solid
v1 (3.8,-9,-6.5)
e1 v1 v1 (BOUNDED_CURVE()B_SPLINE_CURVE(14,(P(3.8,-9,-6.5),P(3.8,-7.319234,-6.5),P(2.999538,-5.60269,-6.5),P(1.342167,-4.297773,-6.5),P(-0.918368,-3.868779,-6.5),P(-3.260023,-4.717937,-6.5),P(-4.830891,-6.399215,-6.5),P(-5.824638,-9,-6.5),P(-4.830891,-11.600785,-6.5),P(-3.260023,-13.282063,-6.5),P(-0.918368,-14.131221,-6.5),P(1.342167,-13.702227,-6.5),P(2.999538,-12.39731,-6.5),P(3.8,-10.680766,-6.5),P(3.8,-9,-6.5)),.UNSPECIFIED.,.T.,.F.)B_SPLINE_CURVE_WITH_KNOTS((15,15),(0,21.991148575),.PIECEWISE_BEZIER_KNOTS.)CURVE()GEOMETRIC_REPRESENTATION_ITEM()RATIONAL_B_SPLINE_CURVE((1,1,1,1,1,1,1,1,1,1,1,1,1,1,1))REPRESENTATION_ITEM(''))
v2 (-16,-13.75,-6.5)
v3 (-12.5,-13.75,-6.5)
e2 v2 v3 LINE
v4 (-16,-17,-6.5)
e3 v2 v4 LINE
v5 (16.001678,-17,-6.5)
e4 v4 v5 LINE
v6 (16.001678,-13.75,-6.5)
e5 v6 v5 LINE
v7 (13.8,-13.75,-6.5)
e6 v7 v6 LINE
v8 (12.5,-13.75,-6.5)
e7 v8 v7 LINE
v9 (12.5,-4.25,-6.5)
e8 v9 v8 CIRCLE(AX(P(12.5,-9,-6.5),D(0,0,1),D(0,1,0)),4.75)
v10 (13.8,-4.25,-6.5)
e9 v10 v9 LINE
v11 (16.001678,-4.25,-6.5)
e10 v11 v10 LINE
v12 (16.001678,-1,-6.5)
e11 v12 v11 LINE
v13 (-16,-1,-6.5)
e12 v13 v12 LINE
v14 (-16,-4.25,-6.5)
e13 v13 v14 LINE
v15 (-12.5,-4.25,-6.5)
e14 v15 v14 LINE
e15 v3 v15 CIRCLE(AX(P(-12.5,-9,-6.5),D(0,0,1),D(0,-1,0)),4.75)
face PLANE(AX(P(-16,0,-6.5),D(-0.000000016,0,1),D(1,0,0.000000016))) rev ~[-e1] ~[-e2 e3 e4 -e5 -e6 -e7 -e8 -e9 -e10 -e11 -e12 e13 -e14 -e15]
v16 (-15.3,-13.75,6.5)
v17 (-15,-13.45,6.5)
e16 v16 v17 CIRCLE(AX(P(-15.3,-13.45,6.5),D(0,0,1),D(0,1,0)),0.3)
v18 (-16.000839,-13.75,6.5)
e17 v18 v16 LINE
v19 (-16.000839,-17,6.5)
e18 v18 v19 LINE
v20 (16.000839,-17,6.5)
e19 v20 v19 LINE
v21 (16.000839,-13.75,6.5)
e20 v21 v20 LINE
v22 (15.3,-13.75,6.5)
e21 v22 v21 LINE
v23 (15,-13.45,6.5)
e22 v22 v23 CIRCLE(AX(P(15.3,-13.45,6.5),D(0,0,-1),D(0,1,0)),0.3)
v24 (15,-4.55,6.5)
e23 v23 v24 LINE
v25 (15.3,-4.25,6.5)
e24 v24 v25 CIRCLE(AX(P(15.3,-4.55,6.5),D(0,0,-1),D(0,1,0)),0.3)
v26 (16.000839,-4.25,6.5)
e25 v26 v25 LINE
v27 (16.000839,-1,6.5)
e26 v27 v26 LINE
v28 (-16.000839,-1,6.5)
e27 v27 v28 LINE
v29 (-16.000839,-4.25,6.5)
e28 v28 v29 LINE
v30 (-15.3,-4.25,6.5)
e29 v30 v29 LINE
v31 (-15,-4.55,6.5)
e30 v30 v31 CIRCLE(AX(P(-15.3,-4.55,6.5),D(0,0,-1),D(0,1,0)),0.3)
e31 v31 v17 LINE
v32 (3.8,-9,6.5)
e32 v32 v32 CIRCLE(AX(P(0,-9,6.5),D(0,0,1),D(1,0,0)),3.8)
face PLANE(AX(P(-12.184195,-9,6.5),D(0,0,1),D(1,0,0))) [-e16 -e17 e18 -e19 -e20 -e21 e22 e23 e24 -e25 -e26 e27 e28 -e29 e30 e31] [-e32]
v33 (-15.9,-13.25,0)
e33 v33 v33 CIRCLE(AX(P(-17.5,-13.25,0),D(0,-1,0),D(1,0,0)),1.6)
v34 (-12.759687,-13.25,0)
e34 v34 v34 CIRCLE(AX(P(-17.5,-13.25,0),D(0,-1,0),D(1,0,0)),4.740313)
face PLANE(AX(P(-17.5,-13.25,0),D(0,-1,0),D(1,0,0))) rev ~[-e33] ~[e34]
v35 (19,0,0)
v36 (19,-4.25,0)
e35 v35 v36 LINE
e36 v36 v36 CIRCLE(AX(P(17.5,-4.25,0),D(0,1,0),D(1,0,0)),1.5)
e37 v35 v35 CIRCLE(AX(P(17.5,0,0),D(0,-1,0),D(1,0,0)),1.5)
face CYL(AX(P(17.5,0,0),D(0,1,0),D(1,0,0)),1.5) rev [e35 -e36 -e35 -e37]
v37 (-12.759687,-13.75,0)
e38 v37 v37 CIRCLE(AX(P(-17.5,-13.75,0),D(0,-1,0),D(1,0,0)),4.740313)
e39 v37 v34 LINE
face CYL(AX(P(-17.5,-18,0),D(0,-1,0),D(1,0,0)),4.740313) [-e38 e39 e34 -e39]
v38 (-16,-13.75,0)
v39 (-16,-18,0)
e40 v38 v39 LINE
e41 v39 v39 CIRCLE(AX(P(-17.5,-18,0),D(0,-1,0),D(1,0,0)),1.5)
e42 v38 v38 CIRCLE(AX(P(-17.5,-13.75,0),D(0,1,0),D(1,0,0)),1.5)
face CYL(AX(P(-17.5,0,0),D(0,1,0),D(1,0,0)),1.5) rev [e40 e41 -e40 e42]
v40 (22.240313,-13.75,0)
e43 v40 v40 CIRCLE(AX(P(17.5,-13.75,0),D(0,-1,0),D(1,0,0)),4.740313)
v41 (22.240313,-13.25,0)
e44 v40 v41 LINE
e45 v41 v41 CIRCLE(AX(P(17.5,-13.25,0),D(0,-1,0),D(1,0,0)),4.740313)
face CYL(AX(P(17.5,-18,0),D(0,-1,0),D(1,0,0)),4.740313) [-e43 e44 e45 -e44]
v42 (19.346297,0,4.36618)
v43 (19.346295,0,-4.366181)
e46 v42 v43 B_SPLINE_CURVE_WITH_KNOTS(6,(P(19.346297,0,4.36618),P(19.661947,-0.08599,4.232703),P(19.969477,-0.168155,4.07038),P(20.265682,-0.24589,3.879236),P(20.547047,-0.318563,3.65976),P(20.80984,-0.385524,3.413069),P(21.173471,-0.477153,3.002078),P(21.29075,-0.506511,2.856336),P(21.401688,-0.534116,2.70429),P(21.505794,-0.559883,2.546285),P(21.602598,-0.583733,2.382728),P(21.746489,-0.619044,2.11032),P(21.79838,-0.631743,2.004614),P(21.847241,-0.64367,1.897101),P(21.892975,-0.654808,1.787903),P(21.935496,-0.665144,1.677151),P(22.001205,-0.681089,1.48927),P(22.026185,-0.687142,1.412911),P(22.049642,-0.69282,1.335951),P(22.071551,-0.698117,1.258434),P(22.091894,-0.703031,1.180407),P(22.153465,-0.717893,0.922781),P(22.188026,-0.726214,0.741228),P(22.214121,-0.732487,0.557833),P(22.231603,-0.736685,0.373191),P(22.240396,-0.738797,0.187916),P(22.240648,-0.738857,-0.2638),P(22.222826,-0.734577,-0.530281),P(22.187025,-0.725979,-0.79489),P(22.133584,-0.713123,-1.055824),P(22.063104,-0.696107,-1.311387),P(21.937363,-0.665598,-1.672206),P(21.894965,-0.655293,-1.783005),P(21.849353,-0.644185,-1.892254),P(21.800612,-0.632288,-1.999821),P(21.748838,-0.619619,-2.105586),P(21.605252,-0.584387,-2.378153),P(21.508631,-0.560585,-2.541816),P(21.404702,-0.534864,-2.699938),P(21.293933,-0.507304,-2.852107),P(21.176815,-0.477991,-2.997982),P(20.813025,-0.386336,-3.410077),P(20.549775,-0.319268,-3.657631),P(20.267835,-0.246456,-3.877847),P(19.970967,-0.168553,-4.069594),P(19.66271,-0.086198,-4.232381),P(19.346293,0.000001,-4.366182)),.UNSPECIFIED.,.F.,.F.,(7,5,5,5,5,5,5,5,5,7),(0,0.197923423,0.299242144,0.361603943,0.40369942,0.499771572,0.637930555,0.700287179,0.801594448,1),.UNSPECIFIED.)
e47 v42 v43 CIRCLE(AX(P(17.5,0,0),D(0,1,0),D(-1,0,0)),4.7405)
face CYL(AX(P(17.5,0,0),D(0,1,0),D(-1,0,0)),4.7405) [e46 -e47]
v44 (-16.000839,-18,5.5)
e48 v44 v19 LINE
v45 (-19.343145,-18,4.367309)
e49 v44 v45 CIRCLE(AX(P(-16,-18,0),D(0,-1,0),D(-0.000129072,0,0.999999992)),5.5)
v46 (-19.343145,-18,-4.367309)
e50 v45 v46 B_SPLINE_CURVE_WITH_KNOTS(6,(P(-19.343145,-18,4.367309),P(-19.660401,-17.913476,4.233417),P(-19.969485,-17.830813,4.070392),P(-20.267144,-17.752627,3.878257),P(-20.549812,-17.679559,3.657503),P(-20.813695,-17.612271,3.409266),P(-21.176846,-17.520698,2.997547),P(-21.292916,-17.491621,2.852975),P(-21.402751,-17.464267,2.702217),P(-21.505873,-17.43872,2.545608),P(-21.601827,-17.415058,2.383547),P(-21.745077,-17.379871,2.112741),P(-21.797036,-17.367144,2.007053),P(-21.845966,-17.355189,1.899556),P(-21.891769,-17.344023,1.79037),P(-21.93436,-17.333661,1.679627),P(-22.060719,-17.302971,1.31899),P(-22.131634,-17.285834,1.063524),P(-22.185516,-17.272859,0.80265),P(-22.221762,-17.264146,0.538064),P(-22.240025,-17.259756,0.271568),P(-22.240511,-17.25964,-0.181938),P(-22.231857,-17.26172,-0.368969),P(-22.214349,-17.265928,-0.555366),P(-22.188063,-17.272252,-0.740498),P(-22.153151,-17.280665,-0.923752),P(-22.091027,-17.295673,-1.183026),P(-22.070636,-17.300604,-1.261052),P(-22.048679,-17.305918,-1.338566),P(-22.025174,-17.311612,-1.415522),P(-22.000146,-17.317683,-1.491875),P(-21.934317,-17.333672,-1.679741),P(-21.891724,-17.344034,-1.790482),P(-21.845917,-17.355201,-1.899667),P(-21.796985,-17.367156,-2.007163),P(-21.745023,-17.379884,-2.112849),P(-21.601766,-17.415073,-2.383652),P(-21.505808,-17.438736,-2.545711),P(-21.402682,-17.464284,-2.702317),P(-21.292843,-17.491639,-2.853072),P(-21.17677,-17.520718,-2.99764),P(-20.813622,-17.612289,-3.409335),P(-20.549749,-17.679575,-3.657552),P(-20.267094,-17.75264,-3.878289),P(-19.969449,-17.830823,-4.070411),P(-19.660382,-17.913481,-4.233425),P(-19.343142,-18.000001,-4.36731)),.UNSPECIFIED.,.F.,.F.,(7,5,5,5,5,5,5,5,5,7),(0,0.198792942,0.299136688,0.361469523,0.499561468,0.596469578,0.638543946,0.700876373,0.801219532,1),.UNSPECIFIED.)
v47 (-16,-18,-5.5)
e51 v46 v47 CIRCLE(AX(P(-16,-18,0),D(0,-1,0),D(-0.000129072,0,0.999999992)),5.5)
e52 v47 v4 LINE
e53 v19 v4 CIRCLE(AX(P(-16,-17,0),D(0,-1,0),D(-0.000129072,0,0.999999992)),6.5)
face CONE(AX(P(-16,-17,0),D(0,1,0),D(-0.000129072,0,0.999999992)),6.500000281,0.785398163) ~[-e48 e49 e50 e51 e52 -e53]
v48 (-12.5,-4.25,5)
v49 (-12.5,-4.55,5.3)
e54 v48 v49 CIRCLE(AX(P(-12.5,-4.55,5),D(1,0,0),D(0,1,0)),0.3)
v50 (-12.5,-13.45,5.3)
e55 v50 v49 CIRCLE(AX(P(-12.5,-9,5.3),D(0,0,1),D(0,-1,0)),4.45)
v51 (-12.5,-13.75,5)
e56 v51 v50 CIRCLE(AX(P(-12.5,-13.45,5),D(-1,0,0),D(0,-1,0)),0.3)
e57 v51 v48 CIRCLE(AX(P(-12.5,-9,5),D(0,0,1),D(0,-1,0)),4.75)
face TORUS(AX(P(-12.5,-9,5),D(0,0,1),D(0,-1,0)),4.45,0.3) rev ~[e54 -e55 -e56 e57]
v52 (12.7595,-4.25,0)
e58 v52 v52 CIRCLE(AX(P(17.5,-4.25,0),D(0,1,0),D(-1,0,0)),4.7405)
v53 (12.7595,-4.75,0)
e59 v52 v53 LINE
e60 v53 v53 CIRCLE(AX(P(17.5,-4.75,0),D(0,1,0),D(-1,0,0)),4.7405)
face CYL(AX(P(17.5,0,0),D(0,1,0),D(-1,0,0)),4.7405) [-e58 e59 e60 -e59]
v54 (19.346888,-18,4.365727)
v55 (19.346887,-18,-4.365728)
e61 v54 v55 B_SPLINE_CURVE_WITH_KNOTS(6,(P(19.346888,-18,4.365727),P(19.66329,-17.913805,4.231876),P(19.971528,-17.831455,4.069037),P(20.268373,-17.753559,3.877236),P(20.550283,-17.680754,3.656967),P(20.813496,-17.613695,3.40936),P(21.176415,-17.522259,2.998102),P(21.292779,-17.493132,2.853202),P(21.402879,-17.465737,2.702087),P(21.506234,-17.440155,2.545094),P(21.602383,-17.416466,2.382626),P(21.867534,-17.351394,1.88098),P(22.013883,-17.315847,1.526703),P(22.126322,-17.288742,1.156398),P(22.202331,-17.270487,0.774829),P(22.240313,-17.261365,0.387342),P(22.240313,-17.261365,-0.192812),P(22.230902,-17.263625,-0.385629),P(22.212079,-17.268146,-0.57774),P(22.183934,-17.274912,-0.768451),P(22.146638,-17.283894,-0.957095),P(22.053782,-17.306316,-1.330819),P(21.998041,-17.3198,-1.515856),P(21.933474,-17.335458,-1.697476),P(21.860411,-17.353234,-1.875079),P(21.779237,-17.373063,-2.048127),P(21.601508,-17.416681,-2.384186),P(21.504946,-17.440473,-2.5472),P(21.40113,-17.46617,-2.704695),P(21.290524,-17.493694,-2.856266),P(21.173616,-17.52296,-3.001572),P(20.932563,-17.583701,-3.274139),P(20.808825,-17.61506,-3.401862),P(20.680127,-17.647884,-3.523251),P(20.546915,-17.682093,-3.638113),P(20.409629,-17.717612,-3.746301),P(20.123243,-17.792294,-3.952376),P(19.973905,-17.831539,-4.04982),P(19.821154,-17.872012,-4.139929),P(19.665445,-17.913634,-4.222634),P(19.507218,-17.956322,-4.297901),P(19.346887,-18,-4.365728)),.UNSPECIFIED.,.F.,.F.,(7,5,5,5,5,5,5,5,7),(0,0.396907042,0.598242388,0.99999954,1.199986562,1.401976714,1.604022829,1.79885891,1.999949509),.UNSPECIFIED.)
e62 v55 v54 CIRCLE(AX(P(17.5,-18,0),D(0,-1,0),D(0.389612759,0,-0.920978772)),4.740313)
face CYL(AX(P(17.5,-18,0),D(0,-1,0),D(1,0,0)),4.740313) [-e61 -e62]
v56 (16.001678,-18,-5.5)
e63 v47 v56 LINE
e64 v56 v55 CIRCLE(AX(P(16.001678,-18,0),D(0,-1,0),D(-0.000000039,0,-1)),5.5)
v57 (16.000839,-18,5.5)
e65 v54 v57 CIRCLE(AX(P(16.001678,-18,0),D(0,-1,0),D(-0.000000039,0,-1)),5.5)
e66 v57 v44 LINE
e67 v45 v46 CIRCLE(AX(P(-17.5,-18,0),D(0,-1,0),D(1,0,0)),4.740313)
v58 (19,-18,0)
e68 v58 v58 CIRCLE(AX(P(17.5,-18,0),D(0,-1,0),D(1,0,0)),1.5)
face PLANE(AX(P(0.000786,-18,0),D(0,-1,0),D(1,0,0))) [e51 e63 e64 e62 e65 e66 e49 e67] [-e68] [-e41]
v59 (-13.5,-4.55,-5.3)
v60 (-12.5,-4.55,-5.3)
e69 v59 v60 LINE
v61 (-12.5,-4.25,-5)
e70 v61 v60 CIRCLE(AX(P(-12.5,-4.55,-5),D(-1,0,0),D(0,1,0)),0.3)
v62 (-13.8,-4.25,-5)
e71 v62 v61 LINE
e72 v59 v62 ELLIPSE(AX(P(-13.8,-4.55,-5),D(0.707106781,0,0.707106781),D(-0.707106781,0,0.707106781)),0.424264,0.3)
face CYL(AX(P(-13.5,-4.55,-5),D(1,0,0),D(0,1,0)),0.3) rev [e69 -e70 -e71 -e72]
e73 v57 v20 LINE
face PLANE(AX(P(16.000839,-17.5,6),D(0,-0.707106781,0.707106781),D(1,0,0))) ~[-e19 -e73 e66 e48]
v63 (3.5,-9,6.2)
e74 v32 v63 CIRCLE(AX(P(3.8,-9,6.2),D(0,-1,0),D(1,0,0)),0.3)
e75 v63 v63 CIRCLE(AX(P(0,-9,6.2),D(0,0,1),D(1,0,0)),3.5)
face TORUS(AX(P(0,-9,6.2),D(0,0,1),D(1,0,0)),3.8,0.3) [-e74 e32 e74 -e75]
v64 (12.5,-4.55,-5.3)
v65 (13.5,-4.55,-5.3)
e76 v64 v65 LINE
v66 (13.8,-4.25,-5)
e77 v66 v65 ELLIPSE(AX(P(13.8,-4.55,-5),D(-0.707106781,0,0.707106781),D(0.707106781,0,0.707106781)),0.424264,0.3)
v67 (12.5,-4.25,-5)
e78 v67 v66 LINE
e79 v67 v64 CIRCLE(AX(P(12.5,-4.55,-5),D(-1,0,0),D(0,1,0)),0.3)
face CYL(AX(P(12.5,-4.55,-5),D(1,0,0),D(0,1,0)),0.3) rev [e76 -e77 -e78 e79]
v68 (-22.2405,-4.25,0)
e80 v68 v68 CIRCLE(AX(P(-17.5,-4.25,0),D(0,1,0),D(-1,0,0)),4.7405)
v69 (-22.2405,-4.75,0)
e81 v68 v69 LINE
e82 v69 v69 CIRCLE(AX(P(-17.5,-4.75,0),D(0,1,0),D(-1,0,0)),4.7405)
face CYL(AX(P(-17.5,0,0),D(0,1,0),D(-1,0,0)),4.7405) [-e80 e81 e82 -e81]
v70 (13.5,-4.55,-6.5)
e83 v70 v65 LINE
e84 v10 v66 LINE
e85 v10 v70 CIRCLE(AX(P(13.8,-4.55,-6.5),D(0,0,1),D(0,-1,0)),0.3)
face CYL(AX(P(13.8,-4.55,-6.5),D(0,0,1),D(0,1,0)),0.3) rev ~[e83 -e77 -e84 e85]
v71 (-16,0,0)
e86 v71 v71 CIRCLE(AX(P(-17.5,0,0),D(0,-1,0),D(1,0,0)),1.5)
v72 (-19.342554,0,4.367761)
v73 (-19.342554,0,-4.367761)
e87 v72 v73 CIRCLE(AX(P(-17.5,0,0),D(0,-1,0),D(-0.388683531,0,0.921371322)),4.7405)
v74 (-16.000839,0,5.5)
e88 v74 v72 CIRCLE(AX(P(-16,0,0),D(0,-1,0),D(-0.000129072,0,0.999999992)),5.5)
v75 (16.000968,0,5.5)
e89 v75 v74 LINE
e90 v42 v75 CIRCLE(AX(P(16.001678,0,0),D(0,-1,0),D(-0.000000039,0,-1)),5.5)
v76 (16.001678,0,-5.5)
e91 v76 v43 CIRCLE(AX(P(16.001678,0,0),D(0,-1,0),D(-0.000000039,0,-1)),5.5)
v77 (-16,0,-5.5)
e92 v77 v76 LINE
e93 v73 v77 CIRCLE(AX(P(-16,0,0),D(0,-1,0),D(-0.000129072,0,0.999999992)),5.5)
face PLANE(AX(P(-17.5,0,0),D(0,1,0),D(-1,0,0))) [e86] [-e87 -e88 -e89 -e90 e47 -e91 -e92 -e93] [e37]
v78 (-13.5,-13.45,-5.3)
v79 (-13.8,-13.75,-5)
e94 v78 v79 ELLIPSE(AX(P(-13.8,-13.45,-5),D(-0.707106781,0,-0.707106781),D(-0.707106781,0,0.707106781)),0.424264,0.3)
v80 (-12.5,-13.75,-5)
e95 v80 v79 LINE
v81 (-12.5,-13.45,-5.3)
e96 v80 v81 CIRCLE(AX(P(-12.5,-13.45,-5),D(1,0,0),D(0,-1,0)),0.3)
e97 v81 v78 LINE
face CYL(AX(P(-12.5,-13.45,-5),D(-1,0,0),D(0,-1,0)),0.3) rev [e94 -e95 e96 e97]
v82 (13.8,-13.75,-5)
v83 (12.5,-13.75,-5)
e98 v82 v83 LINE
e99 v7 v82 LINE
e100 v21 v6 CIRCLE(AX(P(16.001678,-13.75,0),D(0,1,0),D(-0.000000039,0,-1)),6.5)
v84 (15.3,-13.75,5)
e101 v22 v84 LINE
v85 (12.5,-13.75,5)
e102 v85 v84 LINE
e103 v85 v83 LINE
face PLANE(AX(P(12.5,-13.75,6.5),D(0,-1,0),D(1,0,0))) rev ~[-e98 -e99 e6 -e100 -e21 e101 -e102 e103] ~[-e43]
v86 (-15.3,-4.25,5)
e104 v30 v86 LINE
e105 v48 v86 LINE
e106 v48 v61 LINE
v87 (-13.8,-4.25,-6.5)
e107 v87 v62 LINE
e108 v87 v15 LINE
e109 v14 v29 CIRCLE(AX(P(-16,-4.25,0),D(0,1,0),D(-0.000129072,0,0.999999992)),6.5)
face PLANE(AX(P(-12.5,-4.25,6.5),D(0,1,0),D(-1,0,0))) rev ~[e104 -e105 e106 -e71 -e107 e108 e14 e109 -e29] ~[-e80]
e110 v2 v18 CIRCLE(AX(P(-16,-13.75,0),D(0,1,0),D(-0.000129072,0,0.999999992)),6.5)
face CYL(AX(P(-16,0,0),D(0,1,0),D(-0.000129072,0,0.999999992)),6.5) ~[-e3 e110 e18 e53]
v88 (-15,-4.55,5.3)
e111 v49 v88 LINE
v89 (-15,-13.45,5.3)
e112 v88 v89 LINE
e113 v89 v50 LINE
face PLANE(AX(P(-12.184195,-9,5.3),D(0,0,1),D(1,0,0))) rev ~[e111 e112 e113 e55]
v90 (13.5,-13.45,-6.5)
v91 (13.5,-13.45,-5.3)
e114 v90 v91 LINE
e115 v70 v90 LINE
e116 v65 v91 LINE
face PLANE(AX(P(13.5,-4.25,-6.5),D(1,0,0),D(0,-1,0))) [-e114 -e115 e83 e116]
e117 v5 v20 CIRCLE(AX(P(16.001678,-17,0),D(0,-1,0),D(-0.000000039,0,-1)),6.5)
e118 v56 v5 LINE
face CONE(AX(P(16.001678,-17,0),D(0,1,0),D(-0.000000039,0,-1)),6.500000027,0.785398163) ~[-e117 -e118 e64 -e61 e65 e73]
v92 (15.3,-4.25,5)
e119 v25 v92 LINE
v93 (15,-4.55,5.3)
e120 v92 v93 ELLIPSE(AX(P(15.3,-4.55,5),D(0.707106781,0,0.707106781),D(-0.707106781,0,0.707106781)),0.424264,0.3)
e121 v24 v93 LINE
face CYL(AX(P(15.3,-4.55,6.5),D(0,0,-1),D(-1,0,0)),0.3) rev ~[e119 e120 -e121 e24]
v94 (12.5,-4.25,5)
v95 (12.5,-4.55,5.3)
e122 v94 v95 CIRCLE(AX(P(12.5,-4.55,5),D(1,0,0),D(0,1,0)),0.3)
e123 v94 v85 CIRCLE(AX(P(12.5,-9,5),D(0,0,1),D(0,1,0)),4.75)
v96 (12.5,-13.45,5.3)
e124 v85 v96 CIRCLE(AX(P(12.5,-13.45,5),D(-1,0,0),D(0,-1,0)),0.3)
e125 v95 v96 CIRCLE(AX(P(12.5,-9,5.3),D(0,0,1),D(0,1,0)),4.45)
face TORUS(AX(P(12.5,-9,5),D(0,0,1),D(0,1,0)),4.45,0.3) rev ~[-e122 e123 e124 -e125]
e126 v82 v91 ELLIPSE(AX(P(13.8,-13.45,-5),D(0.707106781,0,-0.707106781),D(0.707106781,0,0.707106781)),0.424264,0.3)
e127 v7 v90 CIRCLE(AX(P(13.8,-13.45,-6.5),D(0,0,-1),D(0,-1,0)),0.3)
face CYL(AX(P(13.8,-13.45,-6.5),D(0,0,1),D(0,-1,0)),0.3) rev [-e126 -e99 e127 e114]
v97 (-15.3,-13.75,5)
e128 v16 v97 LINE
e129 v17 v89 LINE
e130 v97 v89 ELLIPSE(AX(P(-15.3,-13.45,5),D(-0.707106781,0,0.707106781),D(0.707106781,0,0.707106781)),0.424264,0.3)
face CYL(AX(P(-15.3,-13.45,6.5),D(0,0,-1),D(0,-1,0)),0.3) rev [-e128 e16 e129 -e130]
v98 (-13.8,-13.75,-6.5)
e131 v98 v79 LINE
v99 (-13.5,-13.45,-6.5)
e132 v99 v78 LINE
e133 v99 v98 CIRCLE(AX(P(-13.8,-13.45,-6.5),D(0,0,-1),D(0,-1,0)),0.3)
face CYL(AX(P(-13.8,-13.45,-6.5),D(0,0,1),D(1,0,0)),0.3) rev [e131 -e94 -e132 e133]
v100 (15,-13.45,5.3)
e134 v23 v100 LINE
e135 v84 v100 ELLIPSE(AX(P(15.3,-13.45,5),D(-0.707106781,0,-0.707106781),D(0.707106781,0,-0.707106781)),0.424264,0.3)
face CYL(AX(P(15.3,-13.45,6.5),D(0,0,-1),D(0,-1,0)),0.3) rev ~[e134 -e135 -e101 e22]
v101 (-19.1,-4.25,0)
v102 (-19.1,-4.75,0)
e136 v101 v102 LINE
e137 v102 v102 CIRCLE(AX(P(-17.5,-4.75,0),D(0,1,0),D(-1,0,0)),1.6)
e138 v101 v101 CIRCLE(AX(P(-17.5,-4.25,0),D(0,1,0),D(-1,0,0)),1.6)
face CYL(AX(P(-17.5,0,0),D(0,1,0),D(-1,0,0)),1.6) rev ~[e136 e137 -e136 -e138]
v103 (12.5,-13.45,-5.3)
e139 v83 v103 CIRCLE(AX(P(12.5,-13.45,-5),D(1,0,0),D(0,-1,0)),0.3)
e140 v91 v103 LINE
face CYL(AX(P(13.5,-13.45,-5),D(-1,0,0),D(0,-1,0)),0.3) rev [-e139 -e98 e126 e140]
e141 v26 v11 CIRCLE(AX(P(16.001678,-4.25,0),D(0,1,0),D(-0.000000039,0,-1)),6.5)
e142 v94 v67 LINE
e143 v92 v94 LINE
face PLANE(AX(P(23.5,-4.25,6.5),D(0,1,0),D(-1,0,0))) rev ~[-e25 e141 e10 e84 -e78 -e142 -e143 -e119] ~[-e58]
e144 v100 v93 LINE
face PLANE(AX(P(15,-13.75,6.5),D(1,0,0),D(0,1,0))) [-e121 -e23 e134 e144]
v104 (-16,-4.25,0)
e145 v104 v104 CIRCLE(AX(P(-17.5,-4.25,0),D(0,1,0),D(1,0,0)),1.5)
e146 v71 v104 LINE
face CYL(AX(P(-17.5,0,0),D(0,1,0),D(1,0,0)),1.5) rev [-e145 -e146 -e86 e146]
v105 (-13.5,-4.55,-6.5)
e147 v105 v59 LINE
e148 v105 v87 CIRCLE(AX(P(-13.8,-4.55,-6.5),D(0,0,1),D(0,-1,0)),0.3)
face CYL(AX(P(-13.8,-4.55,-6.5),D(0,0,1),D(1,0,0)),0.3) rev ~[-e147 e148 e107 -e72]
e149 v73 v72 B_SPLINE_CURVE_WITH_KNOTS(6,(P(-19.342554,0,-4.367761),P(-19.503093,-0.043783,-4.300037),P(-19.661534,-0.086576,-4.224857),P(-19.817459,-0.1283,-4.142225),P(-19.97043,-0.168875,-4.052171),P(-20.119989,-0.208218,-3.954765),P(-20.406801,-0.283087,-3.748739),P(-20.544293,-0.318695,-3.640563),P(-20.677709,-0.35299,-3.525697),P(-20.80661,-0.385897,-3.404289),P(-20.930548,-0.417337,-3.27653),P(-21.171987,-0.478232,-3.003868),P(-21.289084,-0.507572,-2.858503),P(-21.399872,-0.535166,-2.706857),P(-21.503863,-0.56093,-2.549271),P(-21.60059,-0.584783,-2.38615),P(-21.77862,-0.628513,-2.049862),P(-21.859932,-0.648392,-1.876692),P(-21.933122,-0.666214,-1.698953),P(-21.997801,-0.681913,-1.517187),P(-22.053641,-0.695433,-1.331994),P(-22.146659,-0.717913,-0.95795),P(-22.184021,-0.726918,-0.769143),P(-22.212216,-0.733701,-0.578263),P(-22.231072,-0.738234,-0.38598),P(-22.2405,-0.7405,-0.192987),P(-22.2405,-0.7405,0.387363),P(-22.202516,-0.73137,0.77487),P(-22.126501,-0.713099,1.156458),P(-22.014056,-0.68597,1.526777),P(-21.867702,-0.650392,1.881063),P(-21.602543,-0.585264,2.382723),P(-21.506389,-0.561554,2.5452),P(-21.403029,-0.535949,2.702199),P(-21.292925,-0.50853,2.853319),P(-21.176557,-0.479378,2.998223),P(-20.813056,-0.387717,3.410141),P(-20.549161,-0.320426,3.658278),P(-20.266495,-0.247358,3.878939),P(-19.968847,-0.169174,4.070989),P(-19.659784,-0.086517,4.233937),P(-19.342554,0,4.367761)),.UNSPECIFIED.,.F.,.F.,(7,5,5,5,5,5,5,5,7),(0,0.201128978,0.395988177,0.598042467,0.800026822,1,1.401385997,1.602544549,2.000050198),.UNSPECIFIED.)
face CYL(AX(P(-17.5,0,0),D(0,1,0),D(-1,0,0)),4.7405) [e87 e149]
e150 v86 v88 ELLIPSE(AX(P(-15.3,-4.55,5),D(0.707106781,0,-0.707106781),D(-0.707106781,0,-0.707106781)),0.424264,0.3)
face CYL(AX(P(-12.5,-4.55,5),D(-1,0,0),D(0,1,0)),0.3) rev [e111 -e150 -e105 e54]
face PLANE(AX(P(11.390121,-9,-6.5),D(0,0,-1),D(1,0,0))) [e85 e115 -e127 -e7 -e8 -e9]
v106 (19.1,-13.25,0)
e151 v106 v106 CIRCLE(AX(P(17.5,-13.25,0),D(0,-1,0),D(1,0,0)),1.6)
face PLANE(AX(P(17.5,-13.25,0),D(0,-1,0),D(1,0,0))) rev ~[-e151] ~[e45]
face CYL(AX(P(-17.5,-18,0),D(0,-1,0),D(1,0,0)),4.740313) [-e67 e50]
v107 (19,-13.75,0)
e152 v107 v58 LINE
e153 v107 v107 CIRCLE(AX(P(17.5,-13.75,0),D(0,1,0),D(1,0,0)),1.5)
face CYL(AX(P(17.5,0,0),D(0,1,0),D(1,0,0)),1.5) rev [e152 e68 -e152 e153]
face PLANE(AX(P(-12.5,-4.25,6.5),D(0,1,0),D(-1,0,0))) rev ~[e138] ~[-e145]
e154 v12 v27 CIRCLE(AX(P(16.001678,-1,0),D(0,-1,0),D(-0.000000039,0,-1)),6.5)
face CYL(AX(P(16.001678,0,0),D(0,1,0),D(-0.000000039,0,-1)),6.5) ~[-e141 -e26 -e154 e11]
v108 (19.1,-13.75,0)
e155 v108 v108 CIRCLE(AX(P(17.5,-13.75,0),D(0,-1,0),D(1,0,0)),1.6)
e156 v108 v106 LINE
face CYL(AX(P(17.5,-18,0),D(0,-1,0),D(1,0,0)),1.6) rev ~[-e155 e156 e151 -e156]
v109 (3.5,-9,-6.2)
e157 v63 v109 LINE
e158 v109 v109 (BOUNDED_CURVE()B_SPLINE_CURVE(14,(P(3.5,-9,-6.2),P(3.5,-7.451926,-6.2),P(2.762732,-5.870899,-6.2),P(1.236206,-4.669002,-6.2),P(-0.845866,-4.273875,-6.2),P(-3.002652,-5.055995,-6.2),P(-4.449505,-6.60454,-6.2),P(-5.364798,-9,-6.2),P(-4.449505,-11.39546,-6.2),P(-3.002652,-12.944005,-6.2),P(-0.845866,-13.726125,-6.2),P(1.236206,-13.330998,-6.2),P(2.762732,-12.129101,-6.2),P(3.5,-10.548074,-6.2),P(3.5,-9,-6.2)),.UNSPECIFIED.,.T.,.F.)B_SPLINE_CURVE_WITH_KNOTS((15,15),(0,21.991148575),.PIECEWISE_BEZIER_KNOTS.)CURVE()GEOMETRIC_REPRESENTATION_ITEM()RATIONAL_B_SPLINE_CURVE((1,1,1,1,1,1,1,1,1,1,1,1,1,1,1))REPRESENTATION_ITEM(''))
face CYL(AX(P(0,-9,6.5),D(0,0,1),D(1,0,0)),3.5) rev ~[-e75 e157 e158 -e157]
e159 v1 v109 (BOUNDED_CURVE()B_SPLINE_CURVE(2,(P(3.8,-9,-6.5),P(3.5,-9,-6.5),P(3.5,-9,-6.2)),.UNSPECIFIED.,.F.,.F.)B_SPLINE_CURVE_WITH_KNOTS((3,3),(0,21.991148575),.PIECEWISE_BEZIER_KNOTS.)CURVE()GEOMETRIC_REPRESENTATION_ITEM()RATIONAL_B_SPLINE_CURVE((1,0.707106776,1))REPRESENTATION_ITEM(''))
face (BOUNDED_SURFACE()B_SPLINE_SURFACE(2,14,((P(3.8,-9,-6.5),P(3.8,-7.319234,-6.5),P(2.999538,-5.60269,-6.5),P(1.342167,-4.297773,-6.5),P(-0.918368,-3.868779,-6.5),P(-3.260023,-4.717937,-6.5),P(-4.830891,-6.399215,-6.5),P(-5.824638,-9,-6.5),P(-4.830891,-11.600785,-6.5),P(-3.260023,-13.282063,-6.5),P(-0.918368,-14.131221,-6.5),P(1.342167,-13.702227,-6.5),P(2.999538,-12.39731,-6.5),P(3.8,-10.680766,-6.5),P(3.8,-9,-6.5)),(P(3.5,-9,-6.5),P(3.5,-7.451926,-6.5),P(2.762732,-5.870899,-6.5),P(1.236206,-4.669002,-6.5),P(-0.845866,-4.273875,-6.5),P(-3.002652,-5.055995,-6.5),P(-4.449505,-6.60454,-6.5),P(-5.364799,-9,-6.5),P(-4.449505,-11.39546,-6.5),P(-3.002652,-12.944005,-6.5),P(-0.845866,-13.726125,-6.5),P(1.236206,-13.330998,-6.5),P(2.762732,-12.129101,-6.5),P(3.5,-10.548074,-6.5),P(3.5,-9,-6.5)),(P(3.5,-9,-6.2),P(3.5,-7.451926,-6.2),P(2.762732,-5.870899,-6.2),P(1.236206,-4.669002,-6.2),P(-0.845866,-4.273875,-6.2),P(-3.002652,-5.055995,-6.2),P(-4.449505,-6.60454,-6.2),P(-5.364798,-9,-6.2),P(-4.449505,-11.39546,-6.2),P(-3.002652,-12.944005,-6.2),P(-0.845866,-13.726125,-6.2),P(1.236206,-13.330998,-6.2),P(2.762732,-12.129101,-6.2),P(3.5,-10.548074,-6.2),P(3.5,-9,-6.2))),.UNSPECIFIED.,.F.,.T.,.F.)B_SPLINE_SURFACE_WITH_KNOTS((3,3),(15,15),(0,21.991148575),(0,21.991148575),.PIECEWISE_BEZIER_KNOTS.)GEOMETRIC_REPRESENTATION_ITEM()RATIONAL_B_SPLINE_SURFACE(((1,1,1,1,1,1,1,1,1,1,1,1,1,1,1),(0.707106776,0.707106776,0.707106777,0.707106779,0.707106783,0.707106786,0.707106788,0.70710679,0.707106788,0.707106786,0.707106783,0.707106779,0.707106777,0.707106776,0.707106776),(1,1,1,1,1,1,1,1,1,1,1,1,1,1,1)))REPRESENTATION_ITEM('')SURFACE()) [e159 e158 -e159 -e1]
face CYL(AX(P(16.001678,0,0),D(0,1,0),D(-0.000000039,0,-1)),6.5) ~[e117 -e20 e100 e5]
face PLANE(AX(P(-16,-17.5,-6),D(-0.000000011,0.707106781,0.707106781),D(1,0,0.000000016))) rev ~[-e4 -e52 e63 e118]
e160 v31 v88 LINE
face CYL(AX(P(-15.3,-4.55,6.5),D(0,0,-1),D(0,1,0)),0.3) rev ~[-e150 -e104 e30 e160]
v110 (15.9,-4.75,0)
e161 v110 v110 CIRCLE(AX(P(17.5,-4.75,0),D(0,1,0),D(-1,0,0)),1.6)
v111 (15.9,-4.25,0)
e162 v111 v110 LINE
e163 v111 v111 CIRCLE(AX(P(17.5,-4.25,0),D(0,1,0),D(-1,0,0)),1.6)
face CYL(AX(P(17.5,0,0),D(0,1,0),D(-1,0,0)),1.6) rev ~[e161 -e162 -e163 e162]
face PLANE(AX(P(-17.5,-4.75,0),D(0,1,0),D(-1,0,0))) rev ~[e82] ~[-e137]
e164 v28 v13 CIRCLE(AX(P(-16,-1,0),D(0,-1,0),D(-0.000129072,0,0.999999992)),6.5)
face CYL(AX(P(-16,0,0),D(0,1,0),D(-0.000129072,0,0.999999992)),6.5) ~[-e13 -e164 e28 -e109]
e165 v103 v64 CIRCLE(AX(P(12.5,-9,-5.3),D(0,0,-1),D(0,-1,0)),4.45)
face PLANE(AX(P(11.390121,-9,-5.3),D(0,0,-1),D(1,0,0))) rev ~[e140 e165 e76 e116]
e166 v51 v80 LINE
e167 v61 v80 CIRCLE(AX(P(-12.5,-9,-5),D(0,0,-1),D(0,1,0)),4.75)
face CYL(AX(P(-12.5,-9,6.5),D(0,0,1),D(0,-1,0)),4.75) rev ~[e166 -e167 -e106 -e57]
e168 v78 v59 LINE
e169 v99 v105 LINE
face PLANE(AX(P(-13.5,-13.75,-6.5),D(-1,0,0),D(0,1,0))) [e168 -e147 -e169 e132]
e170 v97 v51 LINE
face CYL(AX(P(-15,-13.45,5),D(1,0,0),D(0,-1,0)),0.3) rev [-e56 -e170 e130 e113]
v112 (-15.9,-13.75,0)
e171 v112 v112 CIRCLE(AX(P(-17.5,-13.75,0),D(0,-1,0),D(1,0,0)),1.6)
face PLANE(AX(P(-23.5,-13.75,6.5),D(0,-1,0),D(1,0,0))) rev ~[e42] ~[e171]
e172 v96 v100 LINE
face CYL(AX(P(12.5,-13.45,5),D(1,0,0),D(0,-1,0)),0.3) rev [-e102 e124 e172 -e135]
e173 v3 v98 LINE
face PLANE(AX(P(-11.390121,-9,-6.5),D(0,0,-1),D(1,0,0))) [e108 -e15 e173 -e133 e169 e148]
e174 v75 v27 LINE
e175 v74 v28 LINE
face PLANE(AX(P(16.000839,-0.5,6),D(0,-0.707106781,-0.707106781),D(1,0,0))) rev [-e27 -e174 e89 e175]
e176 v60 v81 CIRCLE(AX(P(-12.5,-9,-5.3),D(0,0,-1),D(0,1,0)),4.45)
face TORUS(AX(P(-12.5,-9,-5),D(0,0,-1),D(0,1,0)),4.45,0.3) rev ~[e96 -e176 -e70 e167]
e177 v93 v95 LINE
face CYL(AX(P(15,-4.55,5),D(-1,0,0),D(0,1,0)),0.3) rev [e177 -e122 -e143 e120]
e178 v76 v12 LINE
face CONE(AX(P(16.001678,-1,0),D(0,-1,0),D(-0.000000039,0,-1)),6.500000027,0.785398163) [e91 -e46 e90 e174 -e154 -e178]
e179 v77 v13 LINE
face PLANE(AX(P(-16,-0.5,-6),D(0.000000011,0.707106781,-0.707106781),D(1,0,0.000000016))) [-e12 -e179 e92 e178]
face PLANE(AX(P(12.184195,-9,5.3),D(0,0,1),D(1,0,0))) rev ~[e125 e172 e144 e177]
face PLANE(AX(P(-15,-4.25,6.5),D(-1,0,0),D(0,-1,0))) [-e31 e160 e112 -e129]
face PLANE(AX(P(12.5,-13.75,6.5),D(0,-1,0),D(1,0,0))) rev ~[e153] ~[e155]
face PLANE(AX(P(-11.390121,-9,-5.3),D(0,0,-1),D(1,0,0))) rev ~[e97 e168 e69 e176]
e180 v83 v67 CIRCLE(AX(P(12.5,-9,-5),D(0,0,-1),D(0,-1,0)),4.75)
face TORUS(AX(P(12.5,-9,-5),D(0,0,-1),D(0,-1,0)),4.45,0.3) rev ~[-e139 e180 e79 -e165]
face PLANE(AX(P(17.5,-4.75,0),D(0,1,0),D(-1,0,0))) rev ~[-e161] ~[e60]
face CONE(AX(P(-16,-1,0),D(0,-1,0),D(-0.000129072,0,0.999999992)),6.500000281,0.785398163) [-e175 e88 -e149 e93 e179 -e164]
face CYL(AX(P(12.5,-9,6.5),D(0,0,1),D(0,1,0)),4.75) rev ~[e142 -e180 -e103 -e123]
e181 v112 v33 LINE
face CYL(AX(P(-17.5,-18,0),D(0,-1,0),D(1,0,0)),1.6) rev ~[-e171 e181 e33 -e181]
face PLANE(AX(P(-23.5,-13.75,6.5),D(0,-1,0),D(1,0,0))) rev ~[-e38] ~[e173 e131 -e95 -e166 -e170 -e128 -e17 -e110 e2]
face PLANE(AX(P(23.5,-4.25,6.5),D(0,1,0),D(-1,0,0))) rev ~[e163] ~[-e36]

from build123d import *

# Parameters (mm, degrees)
F0_R      = 1.5
F1_DEPTH  = 18
F2_R      = 3.5
F3_DEPTH  = 13.0010005072
F5_DEPTH  = 13.0010005072
F7_DEPTH  = 1.2
F9_DEPTH  = 1.2
F10_R     = 0.3
F11_SIZE  = 1
F12_R     = 4.7403131941
F12_R_2   = 1.6
F13_DEPTH = 4.75
F14_R     = 4.7405
F14_R_2   = 1.6
F15_DEPTH = 4.75


# Not quite as in the source:
# - ends of sketch curves that miss each other by under 0.0002 mm in the source are joined


with BuildPart() as f1:
    # F0 (on Front) → F1 (new body)
    with BuildSketch(Plane.XZ):
        with BuildLine():
            Line((16.0008389681, 6.5000002265), (-16.0008389681, 6.5000002265))
            ThreePointArc((-16.0008389681, 6.5000002265), (-22.5000002671, -0.0004194841), (-16, -6.5000002807))
            Line((-16, -6.5000002807), (16.0016779362, -6.4999997735))
            ThreePointArc((16.0016779362, -6.4999997735), (22.5016782033, 0.0004194841), (16.0008389681, 6.5000002265))
        make_face()
        with Locations((-17.5, 0)):
            Circle(F0_R, mode=Mode.SUBTRACT)
        with Locations((17.5, 0)):
            Circle(F0_R, mode=Mode.SUBTRACT)
    extrude(amount=F1_DEPTH)

    # F2 (on face) → F3 (cut, through all)
    with BuildSketch(Plane.XY.offset(6.5000002265)):
        with Locations((0, -9)):
            Circle(F2_R)
    extrude(amount=-F3_DEPTH, mode=Mode.SUBTRACT)

    # F4 (on face) → F5 (cut, through all)
    with BuildSketch(Plane.XY.offset(6.5000002265)):
        with BuildLine():
            Line((-12.5, -4.25), (-23.5, -4.25))
            Line((-23.5, -4.25), (-23.5, -13.75))
            Line((-23.5, -13.75), (-12.5, -13.75))
            ThreePointArc((-12.5, -13.75), (-7.75, -9), (-12.5, -4.25))
        make_face()
        with BuildLine():
            ThreePointArc((12.5, -4.25), (7.75, -9), (12.5, -13.75))
            Line((12.5, -13.75), (23.5, -13.75))
            Line((23.5, -13.75), (23.5, -4.25))
            Line((23.5, -4.25), (12.5, -4.25))
        make_face()
    extrude(amount=-F5_DEPTH, mode=Mode.SUBTRACT)

    # F6 (on face) → F7 (join)
    with BuildSketch(Plane.XY.offset(6.5000002265)):
        with BuildLine():
            Line((-12.5, -4.25), (-15, -4.25))
            Line((-15, -4.25), (-15, -13.75))
            Line((-15, -13.75), (-12.5, -13.75))
            ThreePointArc((-12.5, -13.75), (-7.75, -9), (-12.5, -4.25))
        make_face()
        with BuildLine():
            ThreePointArc((12.5, -4.25), (7.75, -9), (12.5, -13.75))
            Line((12.5, -13.75), (15, -13.75))
            Line((15, -13.75), (15, -4.25))
            Line((15, -4.25), (12.5, -4.25))
        make_face()
    extrude(amount=-F7_DEPTH)

    # F8 (on face) → F9 (join)
    with BuildSketch(Plane(origin=(0, 0, -6.4999997735), x_dir=(1, 0, 0), z_dir=(0, 0, -1))):
        with BuildLine():
            Line((-12.5, 13.75), (-13.5, 13.75))
            Line((-13.5, 13.75), (-13.5, 4.25))
            Line((-13.5, 4.25), (-12.5, 4.25))
            ThreePointArc((-12.5, 4.25), (-7.75, 9), (-12.5, 13.75))
        make_face()
        with BuildLine():
            ThreePointArc((12.5, 13.75), (7.75, 9), (12.5, 4.25))
            Line((12.5, 4.25), (13.5, 4.25))
            Line((13.5, 4.25), (13.5, 13.75))
            Line((13.5, 13.75), (12.5, 13.75))
        make_face()
    extrude(amount=-F9_DEPTH)

    # F10
    f10_edges = [f1.edges().sort_by_distance(p)[0] for p in [
        (-15, -4.25, 5.9),
        (-13.5, -4.25, -5.9),
        (-13.75, -4.25, 5.3),
        (-15, -13.75, 5.9),
        (-13.5, -13.75, -5.9),
        (-13, -13.75, -5.3),
        (15, -13.75, 5.9),
        (13.75, -13.75, 5.3),
        (13.5, -13.75, -5.9),
        (15, -4.25, 5.9),
        (13.5, -4.25, -5.9),
        (13, -4.25, -5.3),
        (-3.5, -9, 6.5),
        (-3.5, -9, -6.5),
    ]]
    fillet(f10_edges, radius=F10_R)

    # F11
    f11_edges = [f1.edges().sort_by_distance(p)[0] for p in [
        (0, -18, 6.5),
        (0.000839, 0, -6.5),
    ]]
    chamfer(f11_edges, length=F11_SIZE)

    # F12 (on face) → F13 (join)
    with BuildSketch(Plane.XZ.offset(18)):
        with Locations((-17.5, 0)):
            Circle(F12_R)
        with Locations((-17.5, 0)):
            Circle(F12_R_2, mode=Mode.SUBTRACT)
        with Locations((17.5, 0)):
            Circle(F12_R)
        with Locations((17.5, 0)):
            Circle(F12_R_2, mode=Mode.SUBTRACT)
    extrude(amount=-F13_DEPTH)

    # F14 (on face) → F15 (join)
    with BuildSketch(Plane(origin=(0, 0, 0), x_dir=(-1, 0, 0), z_dir=(0, 1, 0))):
        with Locations((17.5, 0)):
            Circle(F14_R)
        with Locations((17.5, 0)):
            Circle(F14_R_2, mode=Mode.SUBTRACT)
        with Locations((-17.5, 0)):
            Circle(F14_R)
        with Locations((-17.5, 0)):
            Circle(F14_R_2, mode=Mode.SUBTRACT)
    extrude(amount=-F15_DEPTH)


solid = f1.part
